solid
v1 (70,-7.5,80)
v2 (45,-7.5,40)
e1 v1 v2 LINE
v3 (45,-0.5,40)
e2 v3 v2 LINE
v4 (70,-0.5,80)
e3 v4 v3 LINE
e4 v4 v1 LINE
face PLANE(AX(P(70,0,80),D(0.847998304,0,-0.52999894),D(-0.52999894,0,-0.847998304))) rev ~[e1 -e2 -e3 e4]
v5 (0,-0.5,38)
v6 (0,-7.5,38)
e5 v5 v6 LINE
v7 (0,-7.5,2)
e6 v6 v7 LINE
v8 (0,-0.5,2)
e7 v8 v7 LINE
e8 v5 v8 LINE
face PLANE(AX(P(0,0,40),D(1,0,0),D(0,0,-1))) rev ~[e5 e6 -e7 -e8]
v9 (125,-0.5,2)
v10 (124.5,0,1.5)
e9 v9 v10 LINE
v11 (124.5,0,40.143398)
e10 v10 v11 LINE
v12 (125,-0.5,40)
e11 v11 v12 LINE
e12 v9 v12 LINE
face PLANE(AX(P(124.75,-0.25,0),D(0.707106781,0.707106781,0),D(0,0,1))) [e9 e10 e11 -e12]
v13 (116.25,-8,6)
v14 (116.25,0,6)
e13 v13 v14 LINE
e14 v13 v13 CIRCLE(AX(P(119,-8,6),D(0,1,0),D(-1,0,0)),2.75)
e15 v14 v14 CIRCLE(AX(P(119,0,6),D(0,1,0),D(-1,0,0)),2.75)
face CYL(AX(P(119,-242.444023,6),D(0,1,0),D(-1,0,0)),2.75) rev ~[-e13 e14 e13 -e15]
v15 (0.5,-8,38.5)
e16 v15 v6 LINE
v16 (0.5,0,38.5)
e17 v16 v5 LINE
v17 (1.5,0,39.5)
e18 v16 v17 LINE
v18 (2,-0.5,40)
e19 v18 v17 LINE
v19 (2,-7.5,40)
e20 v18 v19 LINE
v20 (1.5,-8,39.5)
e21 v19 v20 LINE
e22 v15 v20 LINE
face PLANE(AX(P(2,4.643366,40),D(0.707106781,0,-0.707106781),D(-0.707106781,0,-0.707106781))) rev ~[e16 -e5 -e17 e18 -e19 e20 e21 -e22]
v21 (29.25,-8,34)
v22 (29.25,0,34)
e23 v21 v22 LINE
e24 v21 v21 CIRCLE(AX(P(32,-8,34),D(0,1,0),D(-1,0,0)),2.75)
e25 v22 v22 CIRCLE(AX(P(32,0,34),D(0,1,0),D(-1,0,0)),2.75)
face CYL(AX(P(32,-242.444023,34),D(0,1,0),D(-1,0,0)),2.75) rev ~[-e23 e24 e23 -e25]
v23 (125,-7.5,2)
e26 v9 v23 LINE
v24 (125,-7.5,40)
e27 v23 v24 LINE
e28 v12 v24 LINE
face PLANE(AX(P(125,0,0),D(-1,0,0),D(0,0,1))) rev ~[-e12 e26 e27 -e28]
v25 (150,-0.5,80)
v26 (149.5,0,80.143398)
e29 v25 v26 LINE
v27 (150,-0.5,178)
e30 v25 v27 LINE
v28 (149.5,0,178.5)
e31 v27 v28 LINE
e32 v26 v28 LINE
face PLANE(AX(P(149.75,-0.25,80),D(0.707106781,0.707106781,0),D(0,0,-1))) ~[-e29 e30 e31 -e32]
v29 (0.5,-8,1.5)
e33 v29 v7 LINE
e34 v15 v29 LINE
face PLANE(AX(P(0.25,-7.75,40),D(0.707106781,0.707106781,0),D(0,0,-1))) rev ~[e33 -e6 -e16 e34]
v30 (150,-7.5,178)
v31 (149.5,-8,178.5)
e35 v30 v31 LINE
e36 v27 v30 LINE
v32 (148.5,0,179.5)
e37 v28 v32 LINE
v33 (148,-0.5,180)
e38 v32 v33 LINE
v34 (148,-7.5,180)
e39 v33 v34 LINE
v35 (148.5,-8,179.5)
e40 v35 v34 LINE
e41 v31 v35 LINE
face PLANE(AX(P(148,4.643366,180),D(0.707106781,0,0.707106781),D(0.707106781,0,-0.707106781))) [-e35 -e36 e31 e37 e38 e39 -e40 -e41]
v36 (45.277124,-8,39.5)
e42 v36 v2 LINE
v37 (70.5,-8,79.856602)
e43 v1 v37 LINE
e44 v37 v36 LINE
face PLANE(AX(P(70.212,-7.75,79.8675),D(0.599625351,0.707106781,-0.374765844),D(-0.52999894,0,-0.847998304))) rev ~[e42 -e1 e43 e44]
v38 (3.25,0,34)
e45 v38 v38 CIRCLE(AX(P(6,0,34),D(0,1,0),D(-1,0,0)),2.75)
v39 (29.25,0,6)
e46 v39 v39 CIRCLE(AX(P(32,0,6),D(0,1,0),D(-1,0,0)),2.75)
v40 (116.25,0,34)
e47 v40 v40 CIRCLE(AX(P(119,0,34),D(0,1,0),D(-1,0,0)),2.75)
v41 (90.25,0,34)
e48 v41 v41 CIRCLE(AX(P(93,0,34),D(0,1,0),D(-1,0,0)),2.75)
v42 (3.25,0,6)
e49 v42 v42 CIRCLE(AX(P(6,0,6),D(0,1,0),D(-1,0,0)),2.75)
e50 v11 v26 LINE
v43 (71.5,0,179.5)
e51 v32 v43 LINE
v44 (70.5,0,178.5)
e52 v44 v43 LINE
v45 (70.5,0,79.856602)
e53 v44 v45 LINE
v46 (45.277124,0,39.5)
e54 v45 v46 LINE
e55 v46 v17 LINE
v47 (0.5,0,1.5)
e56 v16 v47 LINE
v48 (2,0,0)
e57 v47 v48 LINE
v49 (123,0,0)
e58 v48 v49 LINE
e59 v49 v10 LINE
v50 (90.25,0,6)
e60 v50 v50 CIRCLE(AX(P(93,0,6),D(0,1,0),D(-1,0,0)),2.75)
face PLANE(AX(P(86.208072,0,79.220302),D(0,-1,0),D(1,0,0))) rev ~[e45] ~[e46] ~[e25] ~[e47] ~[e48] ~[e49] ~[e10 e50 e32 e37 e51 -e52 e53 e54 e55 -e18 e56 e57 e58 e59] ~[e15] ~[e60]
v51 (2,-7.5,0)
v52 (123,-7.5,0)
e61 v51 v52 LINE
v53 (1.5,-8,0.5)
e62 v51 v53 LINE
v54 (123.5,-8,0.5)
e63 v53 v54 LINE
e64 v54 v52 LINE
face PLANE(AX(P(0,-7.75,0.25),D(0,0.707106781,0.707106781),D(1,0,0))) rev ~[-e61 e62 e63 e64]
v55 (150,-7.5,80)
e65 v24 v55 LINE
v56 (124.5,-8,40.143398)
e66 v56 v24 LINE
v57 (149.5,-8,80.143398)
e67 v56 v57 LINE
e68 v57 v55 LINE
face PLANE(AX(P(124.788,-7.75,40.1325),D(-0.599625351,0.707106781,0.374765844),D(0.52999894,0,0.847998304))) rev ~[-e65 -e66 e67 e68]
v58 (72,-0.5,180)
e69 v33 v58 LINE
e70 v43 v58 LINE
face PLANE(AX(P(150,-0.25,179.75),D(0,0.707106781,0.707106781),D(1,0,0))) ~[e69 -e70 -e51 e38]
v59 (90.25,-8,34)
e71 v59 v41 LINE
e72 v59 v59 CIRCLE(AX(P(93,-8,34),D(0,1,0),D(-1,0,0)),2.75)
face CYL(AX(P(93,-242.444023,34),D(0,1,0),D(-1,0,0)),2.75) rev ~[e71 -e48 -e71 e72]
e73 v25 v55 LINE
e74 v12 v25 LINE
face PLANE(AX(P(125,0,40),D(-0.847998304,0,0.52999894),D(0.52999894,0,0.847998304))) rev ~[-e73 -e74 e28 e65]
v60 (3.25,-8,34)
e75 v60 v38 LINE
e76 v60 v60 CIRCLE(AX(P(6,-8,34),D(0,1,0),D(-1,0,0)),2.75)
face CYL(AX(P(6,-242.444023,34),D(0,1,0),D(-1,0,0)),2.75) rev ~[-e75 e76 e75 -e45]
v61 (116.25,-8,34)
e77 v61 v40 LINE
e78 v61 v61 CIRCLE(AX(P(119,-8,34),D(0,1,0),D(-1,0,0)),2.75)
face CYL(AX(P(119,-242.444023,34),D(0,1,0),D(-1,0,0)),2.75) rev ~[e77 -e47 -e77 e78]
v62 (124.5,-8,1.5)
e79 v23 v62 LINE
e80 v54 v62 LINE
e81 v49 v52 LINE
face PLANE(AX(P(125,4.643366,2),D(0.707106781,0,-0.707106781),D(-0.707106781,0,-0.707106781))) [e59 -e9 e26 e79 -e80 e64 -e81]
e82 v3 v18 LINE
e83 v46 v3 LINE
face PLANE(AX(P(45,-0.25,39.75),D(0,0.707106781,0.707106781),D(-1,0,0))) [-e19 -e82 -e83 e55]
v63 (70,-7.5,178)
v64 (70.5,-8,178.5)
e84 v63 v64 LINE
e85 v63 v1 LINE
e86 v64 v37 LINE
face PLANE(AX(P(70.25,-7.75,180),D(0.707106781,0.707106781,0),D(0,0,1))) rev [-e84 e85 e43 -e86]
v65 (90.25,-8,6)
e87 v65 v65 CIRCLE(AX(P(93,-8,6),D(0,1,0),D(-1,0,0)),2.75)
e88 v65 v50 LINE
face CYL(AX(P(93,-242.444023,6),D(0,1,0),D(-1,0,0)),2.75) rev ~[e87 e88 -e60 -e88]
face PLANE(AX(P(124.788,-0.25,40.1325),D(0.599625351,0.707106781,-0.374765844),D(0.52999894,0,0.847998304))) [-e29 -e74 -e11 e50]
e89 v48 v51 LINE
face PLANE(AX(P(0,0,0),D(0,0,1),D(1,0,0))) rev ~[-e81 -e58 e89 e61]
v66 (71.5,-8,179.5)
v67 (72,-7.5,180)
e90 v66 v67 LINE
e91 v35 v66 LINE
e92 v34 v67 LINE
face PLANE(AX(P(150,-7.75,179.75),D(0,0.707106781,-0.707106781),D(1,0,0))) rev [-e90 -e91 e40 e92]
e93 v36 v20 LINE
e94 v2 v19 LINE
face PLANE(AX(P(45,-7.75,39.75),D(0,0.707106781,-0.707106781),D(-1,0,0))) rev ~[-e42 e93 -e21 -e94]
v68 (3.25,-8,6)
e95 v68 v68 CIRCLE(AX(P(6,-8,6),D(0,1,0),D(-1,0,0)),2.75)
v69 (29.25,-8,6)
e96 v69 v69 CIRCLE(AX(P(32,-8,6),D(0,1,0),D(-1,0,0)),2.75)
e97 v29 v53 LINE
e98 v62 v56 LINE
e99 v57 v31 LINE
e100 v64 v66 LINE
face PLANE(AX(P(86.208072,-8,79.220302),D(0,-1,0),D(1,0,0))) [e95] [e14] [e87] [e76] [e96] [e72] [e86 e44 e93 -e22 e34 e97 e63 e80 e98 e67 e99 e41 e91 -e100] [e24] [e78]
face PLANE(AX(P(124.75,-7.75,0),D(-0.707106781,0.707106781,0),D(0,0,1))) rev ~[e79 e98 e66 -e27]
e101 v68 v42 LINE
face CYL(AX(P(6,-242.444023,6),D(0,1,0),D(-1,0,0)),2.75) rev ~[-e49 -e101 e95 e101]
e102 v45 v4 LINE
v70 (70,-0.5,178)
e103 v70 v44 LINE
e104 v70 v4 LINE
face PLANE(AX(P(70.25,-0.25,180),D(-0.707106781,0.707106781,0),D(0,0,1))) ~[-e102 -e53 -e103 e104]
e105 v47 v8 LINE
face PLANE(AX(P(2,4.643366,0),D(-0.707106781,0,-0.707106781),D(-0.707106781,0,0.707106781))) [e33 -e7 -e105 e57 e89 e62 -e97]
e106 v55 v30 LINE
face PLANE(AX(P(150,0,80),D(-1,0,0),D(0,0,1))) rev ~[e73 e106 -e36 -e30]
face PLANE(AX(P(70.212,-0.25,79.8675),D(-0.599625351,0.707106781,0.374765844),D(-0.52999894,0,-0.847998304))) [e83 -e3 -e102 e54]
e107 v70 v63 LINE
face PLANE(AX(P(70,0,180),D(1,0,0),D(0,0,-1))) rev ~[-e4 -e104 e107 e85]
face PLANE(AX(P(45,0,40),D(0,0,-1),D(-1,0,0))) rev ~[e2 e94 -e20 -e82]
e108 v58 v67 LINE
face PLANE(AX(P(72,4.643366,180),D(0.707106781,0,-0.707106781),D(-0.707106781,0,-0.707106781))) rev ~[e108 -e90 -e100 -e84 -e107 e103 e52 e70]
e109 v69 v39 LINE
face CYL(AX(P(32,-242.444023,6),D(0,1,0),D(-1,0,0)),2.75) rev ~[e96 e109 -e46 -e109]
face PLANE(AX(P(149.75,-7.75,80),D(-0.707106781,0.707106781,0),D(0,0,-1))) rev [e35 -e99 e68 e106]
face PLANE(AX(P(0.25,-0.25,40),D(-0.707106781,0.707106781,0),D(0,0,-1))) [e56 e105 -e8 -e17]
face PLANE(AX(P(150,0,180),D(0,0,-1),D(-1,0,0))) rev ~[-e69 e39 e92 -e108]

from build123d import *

# Parameters (mm, degrees)
F1_DEPTH    = 8
F3_D        = 5.5
F4_SIZE     = 0.5
F5_T1_DEPTH = 17.2867319519


# Not quite as in the source:
# - a fillet or chamfer that OpenCascade refuses, or shapes differently, is made with other operations: its cross-section is extruded or revolved along the edge and cut away or added


with BuildPart() as f1:
    # F0 (on Front) → F1 (new body)
    with BuildSketch(Plane.XZ):
        Polygon((150, 180), (70, 180), (70, 80), (45, 40), (0, 40), (0, 0), (125, 0), (125, 40), (150, 80), align=None)
    extrude(amount=F1_DEPTH)

    # F3 (through all)
    with Locations(Plane.XZ.offset(8)):
        with Locations((93, 34), (6, 34), (32, 34), (119, 34), (119, 6), (93, 6), (32, 6), (6, 6)):
            Hole(F3_D / 2)

    # F4
    f4_edges = [f1.edges().sort_by_distance(p)[0] for p in [
        (110, -8, 180),
        (70, -8, 130),
        (57.5, -8, 60),
        (22.5, -8, 40),
        (0, -8, 20),
        (62.5, -8, 0),
        (125, -8, 20),
        (137.5, -8, 60),
        (150, -8, 130),
        (110, 0, 180),
        (150, 0, 130),
        (137.5, 0, 60),
        (125, 0, 20),
        (0, 0, 20),
        (22.5, 0, 40),
        (57.5, 0, 60),
        (70, 0, 130),
    ]]
    chamfer(f4_edges, length=F4_SIZE)

    # F5: chamfer of 2 on 5 edges, made by hand

    # F5_s2 → F5_t1 (cut)
    with BuildSketch(Plane.XZ.offset(-4.6433659759)):
        Polygon((72, 180), (70, 178), (70, 180), align=None)
        Polygon((148, 180), (150, 178), (150, 180), align=None)
        Polygon((2, 40), (0, 38), (0, 40), align=None)
        Polygon((2, 0), (0, 2), (0, 0), align=None)
        Polygon((125, 2), (123, 0), (125, 0), align=None)
    extrude(amount=F5_T1_DEPTH, mode=Mode.SUBTRACT)


solid = f1.part
